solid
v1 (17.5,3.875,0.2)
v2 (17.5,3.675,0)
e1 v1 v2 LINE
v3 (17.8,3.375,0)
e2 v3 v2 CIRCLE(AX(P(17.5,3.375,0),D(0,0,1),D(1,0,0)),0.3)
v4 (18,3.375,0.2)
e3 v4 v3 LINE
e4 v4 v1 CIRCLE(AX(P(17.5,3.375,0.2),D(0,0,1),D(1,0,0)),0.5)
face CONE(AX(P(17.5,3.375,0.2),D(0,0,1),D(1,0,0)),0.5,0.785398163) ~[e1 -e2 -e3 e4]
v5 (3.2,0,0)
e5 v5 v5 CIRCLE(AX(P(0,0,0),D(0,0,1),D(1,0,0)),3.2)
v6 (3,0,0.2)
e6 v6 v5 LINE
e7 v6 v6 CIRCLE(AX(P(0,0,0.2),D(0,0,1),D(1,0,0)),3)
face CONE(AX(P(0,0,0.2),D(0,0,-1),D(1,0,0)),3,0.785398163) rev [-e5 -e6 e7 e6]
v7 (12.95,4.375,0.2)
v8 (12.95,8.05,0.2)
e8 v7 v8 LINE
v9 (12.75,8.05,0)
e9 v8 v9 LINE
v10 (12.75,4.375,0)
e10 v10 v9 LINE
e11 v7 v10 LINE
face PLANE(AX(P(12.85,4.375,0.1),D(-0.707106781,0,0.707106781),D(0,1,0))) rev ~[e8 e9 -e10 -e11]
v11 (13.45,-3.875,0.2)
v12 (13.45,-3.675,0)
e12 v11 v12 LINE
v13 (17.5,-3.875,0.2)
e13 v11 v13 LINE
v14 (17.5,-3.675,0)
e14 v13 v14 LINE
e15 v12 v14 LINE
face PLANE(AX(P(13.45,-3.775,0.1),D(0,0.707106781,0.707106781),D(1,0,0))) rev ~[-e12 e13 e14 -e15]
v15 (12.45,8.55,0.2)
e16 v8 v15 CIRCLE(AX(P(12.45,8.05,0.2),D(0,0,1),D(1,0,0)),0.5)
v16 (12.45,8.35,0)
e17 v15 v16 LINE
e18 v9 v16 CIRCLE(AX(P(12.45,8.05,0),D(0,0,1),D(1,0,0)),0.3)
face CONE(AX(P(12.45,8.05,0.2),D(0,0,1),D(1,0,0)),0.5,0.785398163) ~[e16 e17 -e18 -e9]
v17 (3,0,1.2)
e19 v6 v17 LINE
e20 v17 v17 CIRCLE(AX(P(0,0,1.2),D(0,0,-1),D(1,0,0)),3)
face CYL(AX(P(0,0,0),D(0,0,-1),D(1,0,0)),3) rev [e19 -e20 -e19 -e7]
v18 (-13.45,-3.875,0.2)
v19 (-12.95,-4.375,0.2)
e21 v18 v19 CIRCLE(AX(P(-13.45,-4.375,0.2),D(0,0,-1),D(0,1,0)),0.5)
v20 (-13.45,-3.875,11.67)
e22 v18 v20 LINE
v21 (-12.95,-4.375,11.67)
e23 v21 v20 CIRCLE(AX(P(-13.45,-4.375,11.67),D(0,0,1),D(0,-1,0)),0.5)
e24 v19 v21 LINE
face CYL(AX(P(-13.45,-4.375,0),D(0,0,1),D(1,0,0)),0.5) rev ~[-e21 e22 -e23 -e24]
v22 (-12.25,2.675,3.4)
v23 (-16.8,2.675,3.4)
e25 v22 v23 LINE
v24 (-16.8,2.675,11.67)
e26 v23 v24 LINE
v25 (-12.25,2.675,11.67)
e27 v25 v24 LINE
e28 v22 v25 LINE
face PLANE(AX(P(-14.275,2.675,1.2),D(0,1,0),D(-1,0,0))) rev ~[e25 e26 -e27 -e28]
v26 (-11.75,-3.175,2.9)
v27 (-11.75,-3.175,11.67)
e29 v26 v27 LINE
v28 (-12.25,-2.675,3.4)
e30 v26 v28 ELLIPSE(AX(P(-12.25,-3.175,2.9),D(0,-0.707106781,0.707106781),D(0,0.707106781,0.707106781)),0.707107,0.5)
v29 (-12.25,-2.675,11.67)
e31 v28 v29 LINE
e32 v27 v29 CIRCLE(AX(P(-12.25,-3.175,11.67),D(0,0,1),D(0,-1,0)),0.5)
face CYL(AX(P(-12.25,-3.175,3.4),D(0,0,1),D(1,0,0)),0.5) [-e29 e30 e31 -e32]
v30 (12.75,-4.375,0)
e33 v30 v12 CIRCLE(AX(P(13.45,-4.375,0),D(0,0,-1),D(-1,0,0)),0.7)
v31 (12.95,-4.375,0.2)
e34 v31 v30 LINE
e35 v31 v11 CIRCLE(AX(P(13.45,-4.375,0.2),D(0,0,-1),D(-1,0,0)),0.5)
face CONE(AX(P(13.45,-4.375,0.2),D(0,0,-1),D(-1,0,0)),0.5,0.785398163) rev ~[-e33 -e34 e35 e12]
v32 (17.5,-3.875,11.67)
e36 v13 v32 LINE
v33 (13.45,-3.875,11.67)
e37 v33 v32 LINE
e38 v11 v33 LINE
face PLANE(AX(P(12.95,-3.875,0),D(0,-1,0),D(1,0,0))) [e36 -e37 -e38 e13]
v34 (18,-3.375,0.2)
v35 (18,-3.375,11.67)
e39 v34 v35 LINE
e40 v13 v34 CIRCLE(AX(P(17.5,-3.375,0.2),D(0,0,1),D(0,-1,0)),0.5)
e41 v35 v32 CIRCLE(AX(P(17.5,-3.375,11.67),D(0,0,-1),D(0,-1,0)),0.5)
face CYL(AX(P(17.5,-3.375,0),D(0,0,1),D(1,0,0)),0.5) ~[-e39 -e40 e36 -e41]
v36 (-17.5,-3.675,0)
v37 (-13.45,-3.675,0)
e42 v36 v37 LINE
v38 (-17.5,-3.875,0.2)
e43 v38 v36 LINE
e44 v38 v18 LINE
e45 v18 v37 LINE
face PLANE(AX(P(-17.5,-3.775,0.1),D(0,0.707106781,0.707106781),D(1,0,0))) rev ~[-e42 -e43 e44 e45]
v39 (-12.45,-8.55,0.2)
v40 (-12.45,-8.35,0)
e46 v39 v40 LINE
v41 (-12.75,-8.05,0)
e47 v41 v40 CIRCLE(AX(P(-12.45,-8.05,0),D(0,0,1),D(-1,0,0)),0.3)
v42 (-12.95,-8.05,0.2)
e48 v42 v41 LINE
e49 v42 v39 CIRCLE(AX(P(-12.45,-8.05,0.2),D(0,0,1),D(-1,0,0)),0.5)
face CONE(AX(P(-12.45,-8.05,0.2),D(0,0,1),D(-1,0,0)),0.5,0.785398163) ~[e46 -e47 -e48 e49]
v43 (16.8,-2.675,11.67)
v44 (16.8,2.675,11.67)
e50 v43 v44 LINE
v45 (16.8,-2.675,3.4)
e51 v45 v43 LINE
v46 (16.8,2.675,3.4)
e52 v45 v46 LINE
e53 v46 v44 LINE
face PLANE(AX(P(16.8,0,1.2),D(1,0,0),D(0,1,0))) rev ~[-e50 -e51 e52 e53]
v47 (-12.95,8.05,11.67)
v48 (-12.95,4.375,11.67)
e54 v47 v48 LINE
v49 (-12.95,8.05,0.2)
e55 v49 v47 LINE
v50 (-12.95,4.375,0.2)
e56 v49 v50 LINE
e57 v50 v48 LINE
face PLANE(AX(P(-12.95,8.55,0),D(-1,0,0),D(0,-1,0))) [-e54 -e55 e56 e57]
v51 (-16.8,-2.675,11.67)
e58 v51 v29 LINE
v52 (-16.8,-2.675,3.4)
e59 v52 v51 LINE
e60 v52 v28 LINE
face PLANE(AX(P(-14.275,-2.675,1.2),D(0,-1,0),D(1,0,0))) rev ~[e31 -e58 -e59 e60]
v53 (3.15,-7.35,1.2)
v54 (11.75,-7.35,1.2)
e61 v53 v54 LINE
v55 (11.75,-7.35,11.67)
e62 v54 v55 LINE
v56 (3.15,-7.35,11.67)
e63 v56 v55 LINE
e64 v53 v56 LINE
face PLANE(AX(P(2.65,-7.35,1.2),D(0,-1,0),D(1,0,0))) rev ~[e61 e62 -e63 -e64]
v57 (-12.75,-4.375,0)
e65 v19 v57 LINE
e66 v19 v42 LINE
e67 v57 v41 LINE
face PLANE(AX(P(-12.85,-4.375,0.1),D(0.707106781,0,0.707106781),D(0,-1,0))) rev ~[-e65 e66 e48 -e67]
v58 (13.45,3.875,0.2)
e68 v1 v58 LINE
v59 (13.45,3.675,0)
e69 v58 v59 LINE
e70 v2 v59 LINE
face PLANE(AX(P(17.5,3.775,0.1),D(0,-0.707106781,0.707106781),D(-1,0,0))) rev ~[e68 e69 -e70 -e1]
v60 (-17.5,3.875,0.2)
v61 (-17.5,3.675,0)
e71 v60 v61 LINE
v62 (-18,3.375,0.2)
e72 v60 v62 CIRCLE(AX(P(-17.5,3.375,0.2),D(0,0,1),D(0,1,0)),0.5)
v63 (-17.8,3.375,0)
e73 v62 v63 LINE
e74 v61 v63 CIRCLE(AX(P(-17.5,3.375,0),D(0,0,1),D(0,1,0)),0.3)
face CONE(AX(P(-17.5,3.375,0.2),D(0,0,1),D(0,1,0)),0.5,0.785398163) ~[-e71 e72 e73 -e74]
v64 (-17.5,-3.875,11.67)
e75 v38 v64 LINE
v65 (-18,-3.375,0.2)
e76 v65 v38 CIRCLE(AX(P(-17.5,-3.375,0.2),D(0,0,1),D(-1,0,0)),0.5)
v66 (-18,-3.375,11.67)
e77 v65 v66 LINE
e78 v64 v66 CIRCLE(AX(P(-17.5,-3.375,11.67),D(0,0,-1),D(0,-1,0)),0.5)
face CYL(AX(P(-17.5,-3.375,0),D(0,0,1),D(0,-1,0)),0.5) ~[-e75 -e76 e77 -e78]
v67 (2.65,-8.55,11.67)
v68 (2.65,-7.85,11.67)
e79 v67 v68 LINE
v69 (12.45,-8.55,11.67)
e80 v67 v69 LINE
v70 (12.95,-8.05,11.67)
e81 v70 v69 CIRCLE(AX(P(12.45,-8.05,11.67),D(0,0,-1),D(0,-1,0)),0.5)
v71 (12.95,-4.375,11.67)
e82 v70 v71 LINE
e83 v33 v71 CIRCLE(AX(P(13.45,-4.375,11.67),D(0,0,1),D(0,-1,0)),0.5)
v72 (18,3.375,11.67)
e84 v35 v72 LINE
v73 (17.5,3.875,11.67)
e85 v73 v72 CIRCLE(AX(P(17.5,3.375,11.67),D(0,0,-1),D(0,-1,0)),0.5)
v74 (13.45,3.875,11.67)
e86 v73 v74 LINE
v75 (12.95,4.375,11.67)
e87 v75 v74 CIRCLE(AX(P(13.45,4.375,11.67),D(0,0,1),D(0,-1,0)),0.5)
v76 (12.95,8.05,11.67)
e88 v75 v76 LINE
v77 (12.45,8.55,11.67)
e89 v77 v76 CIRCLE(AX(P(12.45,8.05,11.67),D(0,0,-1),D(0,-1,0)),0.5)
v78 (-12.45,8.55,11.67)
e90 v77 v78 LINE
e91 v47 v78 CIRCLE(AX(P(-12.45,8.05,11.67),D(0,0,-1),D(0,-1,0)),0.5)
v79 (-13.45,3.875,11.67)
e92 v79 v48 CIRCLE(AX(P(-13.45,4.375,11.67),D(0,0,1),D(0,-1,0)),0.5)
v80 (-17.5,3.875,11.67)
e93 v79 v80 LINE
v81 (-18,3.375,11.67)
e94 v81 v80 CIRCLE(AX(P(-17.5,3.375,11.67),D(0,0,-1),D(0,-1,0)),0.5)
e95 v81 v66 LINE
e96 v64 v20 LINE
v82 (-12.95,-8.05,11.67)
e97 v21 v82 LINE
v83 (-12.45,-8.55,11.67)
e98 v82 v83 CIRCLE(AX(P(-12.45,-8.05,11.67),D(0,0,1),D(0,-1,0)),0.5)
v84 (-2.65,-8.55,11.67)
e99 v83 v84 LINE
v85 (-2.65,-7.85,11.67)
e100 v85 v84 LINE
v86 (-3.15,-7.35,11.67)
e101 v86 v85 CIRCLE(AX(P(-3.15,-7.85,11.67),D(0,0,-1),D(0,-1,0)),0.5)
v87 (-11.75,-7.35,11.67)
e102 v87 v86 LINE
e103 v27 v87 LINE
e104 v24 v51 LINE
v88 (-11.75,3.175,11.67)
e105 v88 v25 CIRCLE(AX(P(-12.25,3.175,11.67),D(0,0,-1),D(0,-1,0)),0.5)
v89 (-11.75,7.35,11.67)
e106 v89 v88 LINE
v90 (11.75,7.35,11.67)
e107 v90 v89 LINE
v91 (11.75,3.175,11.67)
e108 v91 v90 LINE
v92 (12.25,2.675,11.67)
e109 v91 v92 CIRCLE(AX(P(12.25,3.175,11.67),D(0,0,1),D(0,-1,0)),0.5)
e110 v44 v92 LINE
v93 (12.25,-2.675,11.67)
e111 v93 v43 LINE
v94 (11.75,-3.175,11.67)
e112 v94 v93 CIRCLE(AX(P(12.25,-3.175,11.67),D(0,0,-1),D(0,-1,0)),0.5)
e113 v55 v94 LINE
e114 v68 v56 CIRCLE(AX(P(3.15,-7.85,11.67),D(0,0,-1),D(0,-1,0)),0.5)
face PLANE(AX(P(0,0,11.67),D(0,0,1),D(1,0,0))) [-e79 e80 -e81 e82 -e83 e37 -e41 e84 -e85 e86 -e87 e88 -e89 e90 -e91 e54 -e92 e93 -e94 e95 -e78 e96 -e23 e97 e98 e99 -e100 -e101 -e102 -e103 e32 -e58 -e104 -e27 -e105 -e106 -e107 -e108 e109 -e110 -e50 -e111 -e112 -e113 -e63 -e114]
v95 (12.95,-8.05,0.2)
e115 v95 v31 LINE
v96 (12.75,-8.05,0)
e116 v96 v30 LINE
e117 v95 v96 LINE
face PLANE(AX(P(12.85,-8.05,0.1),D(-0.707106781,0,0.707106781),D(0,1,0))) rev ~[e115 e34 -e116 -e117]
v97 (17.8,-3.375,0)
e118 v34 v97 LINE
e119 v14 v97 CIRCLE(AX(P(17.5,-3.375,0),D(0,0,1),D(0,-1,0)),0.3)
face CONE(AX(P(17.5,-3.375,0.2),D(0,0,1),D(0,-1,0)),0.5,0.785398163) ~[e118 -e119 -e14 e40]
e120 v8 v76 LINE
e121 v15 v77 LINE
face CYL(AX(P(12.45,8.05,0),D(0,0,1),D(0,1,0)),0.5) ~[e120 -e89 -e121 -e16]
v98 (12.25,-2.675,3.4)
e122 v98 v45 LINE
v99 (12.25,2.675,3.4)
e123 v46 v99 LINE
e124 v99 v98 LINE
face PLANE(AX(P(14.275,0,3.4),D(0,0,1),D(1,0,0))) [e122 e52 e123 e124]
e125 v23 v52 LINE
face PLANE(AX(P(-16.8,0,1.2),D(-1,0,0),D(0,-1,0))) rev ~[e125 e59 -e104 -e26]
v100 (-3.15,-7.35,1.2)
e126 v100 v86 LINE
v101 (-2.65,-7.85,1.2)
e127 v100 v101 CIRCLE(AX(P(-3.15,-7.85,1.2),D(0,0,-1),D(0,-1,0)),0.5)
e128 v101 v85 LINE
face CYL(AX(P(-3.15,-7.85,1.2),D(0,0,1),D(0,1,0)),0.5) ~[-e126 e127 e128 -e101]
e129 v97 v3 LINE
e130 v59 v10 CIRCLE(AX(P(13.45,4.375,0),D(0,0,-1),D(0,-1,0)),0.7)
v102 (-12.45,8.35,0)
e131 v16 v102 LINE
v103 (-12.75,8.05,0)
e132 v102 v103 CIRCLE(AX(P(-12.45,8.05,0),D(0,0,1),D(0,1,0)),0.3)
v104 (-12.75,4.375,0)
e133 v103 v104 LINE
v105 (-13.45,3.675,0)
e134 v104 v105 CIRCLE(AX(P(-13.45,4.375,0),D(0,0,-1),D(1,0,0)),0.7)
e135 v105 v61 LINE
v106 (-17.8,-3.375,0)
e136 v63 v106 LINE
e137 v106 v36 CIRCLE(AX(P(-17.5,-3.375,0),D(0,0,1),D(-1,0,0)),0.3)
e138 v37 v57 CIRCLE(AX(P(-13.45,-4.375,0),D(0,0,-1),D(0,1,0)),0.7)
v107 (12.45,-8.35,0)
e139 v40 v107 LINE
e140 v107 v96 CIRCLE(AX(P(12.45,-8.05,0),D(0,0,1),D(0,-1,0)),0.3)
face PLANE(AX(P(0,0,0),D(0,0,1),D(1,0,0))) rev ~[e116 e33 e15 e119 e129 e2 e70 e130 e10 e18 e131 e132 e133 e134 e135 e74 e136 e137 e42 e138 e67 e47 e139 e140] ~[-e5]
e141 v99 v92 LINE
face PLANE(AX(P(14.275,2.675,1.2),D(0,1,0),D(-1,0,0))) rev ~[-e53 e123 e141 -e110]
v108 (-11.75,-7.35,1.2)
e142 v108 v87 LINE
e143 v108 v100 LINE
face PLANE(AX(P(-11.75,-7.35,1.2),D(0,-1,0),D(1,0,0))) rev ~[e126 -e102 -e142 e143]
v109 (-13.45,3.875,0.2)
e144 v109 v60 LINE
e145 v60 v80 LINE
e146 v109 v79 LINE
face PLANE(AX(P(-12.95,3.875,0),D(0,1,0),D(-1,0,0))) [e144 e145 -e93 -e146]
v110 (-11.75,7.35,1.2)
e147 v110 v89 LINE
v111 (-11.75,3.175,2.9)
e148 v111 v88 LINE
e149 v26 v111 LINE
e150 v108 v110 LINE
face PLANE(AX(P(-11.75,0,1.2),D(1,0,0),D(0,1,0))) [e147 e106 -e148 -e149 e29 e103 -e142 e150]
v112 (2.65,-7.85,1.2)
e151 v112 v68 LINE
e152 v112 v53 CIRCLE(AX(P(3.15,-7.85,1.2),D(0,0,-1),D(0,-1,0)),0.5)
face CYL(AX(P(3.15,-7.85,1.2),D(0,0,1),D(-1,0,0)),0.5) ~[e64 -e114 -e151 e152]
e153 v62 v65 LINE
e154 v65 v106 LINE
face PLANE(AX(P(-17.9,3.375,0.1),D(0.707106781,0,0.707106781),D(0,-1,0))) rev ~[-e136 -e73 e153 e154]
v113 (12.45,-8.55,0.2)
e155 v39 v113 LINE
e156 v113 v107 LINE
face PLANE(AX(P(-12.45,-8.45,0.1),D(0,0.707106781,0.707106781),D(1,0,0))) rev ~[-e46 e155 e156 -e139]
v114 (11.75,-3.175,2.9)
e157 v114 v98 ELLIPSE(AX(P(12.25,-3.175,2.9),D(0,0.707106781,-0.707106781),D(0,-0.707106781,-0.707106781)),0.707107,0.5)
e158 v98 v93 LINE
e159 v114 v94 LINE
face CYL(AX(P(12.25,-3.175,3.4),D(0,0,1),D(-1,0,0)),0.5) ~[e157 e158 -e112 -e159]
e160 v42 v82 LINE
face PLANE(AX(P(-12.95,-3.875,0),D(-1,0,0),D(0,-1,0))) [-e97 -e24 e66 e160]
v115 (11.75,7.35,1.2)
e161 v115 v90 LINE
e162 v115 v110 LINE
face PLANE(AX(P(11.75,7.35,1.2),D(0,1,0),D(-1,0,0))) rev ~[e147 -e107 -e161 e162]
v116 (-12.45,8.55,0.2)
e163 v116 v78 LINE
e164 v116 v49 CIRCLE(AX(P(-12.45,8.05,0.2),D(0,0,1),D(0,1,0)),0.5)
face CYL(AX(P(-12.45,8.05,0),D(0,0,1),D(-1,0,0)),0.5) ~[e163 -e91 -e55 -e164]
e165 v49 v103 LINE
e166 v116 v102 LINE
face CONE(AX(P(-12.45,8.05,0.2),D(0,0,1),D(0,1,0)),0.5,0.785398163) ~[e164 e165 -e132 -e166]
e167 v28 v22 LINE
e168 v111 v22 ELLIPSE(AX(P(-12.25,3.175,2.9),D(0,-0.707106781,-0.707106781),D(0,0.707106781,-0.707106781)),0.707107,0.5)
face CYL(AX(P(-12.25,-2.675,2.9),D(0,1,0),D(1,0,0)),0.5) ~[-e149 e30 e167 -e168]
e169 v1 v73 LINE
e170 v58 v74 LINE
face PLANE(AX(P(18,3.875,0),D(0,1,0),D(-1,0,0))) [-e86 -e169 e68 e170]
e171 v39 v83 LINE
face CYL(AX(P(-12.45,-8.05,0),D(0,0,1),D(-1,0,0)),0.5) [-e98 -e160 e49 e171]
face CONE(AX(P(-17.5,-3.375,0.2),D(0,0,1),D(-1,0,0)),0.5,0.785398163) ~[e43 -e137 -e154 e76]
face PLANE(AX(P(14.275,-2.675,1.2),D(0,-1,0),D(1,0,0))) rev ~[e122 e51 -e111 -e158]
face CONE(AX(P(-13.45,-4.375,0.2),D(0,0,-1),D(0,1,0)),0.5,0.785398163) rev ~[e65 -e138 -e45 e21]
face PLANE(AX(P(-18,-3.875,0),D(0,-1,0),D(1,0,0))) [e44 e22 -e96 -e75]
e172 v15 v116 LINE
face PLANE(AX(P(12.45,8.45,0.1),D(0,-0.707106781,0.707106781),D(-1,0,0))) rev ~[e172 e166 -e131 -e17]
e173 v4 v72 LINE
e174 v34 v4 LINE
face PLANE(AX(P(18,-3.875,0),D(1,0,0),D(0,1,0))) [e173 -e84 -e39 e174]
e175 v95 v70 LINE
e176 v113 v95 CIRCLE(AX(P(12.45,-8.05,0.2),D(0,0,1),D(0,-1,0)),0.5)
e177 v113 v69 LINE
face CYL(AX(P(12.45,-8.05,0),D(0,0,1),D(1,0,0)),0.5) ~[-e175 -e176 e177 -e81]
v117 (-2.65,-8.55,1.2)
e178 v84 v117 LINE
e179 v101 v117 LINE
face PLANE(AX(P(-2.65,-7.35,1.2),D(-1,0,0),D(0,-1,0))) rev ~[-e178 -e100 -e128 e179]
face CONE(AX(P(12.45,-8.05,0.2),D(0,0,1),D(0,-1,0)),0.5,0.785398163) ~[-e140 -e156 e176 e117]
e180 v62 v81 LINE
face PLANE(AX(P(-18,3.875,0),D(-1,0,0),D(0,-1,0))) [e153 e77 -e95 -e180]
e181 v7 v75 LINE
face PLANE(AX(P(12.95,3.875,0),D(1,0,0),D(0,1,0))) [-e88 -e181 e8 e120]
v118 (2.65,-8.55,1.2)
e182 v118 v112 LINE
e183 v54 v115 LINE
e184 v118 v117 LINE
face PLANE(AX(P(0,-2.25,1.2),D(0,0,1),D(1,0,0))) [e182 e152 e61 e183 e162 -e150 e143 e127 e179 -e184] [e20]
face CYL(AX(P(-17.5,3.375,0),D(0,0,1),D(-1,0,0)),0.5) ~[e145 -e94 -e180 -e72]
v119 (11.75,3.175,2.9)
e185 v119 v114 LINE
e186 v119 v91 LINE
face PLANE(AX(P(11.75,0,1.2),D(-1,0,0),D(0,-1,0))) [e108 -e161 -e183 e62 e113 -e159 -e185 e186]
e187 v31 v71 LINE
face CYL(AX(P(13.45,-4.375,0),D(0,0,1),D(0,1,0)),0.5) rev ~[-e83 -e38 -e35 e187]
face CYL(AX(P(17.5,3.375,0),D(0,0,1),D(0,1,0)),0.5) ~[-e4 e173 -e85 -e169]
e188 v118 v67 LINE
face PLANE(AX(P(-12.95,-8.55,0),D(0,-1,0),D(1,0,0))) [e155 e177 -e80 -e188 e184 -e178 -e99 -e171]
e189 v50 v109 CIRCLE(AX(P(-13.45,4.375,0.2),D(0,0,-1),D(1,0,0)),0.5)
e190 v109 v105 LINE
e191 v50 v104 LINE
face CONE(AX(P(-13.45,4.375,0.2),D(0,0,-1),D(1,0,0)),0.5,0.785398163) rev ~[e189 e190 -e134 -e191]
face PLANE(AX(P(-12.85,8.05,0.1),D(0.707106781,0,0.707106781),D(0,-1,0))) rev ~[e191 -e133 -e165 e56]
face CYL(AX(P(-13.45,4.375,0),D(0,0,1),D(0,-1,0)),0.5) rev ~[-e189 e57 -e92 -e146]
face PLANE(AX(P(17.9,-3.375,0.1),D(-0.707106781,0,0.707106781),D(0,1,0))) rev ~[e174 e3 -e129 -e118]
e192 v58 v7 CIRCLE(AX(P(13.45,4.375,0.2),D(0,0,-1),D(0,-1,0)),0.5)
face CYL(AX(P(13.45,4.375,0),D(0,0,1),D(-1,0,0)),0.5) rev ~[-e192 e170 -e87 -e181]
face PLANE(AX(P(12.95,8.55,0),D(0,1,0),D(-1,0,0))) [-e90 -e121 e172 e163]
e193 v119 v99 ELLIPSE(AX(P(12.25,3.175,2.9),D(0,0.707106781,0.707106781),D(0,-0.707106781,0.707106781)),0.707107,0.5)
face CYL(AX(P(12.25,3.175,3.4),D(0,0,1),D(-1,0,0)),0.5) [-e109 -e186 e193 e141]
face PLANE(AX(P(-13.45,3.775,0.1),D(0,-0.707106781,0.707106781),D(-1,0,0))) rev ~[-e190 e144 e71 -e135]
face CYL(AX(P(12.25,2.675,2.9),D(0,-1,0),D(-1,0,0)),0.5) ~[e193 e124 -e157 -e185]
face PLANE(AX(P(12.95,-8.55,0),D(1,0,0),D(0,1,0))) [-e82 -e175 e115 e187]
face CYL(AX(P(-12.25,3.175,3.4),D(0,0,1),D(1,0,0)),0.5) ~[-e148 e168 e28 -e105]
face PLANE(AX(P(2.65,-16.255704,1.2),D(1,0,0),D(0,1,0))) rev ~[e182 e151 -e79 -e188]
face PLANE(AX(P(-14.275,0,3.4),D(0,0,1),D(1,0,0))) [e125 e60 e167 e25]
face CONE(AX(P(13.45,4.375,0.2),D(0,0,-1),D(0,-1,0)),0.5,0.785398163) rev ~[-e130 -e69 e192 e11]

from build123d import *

# Parameters (mm, degrees)
F4_W      = 5.05
F4_H      = 5.35
F9_R      = 3
F10_DEPTH = 11.671
F11_R     = 0.5
F12_SIZE  = 0.2


with BuildPart() as f6:
    # F6: sweep along a path in F1
    with BuildLine(Plane.XZ) as f6_path:
        Line((0, 0), (0, 1.2))
        Line((0, 1.2), (0, 3.4))
        Line((0, 3.4), (0, 4.67))
        Line((0, 4.67), (0, 11.67))
    # F5 (on Top) → F6 (sweep)
    with BuildSketch(Plane.XY):
        Polygon((-12.95, -8.55), (0, -8.55), (12.95, -8.55), (12.95, -3.875), (18, -3.875), (18, 3.875), (12.95, 3.875), (12.95, 8.55), (-12.95, 8.55), (-12.95, 3.875), (-18, 3.875), (-18, -3.875), (-12.95, -3.875), align=None)
    sweep(path=f6_path.line)

    # F7: sweep along a path in F1
    with BuildLine(Plane.XZ) as f7_path:
        Line((0, 1.2), (0, 3.4))
        Line((0, 3.4), (0, 4.67))
        Line((0, 4.67), (0, 11.67))
    # F4 (on line) → F7 (sweep, cut)
    with BuildSketch(Plane.XY.offset(1.2)):
        Polygon((11.75, 2.675), (11.75, 7.35), (-11.75, 7.35), (-11.75, 2.675), (-11.75, -2.675), (-11.75, -7.35), (-2.65, -7.35), (-2.65, -16.2557040095), (2.65, -16.2557040095), (2.65, -7.35), (11.75, -7.35), (11.75, -2.675), align=None)
        with Locations((14.275, 0)):
            Rectangle(F4_W, F4_H)
        with Locations((-14.275, 0)):
            Rectangle(F4_W, F4_H)
    sweep(path=f7_path.line, mode=Mode.SUBTRACT)

    # F8: sweep along a path in F1
    with BuildLine(Plane.XZ) as f8_path:
        Line((0, 1.2), (0, 3.4))
    # F4 (on line) → F8 (sweep)
    with BuildSketch(Plane.XY.offset(1.2)):
        with Locations((-14.275, 0)):
            Rectangle(F4_W, F4_H)
        with Locations((14.275, 0)):
            Rectangle(F4_W, F4_H)
    sweep(path=f8_path.line)

    # F9 (on Top) → F10 (cut, through all)
    with BuildSketch(Plane.XY):
        Circle(F9_R)
    extrude(amount=F10_DEPTH, mode=Mode.SUBTRACT)

    # F11
    f11_edges = [f6.edges().sort_by_distance(p)[0] for p in [
        (-2.65, -7.35, 6.435),
        (2.65, -7.35, 6.435),
        (-11.75, 0, 3.4),
        (11.75, 0, 3.4),
        (18, -3.875, 5.835),
        (18, 3.875, 5.835),
        (12.95, -8.55, 5.835),
        (12.95, 8.55, 5.835),
        (-12.95, -8.55, 5.835),
        (-18, -3.875, 5.835),
        (-12.95, 8.55, 5.835),
        (-18, 3.875, 5.835),
        (12.95, 3.875, 5.835),
        (12.95, -3.875, 5.835),
        (-12.95, -3.875, 5.835),
        (-12.95, 3.875, 5.835),
        (11.75, 2.675, 7.535),
        (11.75, -2.675, 7.535),
        (-11.75, -2.675, 7.535),
        (-11.75, 2.675, 7.535),
    ]]
    fillet(f11_edges, radius=F11_R)

    # F12
    f12_edges = [f6.edges().sort_by_distance(p)[0] for p in [
        (0, -8.55, 0),
        (-12.803553, -8.403553, 0),
        (12.803553, -8.403553, 0),
        (-12.95, -6.2125, 0),
        (12.95, -6.2125, 0),
        (-13.096447, -4.021447, 0),
        (13.096447, -4.021447, 0),
        (-15.475, -3.875, 0),
        (15.475, -3.875, 0),
        (-17.853553, -3.728553, 0),
        (17.853553, -3.728553, 0),
        (-18, 0, 0),
        (18, 0, 0),
        (-17.853553, 3.728553, 0),
        (17.853553, 3.728553, 0),
        (-15.475, 3.875, 0),
        (15.475, 3.875, 0),
        (-13.096447, 4.021447, 0),
        (13.096447, 4.021447, 0),
        (-12.95, 6.2125, 0),
        (12.95, 6.2125, 0),
        (-12.803553, 8.403553, 0),
        (12.803553, 8.403553, 0),
        (0, 8.55, 0),
        (-3, 0, 0),
    ]]
    chamfer(f12_edges, length=F12_SIZE)


solid = f6.part
